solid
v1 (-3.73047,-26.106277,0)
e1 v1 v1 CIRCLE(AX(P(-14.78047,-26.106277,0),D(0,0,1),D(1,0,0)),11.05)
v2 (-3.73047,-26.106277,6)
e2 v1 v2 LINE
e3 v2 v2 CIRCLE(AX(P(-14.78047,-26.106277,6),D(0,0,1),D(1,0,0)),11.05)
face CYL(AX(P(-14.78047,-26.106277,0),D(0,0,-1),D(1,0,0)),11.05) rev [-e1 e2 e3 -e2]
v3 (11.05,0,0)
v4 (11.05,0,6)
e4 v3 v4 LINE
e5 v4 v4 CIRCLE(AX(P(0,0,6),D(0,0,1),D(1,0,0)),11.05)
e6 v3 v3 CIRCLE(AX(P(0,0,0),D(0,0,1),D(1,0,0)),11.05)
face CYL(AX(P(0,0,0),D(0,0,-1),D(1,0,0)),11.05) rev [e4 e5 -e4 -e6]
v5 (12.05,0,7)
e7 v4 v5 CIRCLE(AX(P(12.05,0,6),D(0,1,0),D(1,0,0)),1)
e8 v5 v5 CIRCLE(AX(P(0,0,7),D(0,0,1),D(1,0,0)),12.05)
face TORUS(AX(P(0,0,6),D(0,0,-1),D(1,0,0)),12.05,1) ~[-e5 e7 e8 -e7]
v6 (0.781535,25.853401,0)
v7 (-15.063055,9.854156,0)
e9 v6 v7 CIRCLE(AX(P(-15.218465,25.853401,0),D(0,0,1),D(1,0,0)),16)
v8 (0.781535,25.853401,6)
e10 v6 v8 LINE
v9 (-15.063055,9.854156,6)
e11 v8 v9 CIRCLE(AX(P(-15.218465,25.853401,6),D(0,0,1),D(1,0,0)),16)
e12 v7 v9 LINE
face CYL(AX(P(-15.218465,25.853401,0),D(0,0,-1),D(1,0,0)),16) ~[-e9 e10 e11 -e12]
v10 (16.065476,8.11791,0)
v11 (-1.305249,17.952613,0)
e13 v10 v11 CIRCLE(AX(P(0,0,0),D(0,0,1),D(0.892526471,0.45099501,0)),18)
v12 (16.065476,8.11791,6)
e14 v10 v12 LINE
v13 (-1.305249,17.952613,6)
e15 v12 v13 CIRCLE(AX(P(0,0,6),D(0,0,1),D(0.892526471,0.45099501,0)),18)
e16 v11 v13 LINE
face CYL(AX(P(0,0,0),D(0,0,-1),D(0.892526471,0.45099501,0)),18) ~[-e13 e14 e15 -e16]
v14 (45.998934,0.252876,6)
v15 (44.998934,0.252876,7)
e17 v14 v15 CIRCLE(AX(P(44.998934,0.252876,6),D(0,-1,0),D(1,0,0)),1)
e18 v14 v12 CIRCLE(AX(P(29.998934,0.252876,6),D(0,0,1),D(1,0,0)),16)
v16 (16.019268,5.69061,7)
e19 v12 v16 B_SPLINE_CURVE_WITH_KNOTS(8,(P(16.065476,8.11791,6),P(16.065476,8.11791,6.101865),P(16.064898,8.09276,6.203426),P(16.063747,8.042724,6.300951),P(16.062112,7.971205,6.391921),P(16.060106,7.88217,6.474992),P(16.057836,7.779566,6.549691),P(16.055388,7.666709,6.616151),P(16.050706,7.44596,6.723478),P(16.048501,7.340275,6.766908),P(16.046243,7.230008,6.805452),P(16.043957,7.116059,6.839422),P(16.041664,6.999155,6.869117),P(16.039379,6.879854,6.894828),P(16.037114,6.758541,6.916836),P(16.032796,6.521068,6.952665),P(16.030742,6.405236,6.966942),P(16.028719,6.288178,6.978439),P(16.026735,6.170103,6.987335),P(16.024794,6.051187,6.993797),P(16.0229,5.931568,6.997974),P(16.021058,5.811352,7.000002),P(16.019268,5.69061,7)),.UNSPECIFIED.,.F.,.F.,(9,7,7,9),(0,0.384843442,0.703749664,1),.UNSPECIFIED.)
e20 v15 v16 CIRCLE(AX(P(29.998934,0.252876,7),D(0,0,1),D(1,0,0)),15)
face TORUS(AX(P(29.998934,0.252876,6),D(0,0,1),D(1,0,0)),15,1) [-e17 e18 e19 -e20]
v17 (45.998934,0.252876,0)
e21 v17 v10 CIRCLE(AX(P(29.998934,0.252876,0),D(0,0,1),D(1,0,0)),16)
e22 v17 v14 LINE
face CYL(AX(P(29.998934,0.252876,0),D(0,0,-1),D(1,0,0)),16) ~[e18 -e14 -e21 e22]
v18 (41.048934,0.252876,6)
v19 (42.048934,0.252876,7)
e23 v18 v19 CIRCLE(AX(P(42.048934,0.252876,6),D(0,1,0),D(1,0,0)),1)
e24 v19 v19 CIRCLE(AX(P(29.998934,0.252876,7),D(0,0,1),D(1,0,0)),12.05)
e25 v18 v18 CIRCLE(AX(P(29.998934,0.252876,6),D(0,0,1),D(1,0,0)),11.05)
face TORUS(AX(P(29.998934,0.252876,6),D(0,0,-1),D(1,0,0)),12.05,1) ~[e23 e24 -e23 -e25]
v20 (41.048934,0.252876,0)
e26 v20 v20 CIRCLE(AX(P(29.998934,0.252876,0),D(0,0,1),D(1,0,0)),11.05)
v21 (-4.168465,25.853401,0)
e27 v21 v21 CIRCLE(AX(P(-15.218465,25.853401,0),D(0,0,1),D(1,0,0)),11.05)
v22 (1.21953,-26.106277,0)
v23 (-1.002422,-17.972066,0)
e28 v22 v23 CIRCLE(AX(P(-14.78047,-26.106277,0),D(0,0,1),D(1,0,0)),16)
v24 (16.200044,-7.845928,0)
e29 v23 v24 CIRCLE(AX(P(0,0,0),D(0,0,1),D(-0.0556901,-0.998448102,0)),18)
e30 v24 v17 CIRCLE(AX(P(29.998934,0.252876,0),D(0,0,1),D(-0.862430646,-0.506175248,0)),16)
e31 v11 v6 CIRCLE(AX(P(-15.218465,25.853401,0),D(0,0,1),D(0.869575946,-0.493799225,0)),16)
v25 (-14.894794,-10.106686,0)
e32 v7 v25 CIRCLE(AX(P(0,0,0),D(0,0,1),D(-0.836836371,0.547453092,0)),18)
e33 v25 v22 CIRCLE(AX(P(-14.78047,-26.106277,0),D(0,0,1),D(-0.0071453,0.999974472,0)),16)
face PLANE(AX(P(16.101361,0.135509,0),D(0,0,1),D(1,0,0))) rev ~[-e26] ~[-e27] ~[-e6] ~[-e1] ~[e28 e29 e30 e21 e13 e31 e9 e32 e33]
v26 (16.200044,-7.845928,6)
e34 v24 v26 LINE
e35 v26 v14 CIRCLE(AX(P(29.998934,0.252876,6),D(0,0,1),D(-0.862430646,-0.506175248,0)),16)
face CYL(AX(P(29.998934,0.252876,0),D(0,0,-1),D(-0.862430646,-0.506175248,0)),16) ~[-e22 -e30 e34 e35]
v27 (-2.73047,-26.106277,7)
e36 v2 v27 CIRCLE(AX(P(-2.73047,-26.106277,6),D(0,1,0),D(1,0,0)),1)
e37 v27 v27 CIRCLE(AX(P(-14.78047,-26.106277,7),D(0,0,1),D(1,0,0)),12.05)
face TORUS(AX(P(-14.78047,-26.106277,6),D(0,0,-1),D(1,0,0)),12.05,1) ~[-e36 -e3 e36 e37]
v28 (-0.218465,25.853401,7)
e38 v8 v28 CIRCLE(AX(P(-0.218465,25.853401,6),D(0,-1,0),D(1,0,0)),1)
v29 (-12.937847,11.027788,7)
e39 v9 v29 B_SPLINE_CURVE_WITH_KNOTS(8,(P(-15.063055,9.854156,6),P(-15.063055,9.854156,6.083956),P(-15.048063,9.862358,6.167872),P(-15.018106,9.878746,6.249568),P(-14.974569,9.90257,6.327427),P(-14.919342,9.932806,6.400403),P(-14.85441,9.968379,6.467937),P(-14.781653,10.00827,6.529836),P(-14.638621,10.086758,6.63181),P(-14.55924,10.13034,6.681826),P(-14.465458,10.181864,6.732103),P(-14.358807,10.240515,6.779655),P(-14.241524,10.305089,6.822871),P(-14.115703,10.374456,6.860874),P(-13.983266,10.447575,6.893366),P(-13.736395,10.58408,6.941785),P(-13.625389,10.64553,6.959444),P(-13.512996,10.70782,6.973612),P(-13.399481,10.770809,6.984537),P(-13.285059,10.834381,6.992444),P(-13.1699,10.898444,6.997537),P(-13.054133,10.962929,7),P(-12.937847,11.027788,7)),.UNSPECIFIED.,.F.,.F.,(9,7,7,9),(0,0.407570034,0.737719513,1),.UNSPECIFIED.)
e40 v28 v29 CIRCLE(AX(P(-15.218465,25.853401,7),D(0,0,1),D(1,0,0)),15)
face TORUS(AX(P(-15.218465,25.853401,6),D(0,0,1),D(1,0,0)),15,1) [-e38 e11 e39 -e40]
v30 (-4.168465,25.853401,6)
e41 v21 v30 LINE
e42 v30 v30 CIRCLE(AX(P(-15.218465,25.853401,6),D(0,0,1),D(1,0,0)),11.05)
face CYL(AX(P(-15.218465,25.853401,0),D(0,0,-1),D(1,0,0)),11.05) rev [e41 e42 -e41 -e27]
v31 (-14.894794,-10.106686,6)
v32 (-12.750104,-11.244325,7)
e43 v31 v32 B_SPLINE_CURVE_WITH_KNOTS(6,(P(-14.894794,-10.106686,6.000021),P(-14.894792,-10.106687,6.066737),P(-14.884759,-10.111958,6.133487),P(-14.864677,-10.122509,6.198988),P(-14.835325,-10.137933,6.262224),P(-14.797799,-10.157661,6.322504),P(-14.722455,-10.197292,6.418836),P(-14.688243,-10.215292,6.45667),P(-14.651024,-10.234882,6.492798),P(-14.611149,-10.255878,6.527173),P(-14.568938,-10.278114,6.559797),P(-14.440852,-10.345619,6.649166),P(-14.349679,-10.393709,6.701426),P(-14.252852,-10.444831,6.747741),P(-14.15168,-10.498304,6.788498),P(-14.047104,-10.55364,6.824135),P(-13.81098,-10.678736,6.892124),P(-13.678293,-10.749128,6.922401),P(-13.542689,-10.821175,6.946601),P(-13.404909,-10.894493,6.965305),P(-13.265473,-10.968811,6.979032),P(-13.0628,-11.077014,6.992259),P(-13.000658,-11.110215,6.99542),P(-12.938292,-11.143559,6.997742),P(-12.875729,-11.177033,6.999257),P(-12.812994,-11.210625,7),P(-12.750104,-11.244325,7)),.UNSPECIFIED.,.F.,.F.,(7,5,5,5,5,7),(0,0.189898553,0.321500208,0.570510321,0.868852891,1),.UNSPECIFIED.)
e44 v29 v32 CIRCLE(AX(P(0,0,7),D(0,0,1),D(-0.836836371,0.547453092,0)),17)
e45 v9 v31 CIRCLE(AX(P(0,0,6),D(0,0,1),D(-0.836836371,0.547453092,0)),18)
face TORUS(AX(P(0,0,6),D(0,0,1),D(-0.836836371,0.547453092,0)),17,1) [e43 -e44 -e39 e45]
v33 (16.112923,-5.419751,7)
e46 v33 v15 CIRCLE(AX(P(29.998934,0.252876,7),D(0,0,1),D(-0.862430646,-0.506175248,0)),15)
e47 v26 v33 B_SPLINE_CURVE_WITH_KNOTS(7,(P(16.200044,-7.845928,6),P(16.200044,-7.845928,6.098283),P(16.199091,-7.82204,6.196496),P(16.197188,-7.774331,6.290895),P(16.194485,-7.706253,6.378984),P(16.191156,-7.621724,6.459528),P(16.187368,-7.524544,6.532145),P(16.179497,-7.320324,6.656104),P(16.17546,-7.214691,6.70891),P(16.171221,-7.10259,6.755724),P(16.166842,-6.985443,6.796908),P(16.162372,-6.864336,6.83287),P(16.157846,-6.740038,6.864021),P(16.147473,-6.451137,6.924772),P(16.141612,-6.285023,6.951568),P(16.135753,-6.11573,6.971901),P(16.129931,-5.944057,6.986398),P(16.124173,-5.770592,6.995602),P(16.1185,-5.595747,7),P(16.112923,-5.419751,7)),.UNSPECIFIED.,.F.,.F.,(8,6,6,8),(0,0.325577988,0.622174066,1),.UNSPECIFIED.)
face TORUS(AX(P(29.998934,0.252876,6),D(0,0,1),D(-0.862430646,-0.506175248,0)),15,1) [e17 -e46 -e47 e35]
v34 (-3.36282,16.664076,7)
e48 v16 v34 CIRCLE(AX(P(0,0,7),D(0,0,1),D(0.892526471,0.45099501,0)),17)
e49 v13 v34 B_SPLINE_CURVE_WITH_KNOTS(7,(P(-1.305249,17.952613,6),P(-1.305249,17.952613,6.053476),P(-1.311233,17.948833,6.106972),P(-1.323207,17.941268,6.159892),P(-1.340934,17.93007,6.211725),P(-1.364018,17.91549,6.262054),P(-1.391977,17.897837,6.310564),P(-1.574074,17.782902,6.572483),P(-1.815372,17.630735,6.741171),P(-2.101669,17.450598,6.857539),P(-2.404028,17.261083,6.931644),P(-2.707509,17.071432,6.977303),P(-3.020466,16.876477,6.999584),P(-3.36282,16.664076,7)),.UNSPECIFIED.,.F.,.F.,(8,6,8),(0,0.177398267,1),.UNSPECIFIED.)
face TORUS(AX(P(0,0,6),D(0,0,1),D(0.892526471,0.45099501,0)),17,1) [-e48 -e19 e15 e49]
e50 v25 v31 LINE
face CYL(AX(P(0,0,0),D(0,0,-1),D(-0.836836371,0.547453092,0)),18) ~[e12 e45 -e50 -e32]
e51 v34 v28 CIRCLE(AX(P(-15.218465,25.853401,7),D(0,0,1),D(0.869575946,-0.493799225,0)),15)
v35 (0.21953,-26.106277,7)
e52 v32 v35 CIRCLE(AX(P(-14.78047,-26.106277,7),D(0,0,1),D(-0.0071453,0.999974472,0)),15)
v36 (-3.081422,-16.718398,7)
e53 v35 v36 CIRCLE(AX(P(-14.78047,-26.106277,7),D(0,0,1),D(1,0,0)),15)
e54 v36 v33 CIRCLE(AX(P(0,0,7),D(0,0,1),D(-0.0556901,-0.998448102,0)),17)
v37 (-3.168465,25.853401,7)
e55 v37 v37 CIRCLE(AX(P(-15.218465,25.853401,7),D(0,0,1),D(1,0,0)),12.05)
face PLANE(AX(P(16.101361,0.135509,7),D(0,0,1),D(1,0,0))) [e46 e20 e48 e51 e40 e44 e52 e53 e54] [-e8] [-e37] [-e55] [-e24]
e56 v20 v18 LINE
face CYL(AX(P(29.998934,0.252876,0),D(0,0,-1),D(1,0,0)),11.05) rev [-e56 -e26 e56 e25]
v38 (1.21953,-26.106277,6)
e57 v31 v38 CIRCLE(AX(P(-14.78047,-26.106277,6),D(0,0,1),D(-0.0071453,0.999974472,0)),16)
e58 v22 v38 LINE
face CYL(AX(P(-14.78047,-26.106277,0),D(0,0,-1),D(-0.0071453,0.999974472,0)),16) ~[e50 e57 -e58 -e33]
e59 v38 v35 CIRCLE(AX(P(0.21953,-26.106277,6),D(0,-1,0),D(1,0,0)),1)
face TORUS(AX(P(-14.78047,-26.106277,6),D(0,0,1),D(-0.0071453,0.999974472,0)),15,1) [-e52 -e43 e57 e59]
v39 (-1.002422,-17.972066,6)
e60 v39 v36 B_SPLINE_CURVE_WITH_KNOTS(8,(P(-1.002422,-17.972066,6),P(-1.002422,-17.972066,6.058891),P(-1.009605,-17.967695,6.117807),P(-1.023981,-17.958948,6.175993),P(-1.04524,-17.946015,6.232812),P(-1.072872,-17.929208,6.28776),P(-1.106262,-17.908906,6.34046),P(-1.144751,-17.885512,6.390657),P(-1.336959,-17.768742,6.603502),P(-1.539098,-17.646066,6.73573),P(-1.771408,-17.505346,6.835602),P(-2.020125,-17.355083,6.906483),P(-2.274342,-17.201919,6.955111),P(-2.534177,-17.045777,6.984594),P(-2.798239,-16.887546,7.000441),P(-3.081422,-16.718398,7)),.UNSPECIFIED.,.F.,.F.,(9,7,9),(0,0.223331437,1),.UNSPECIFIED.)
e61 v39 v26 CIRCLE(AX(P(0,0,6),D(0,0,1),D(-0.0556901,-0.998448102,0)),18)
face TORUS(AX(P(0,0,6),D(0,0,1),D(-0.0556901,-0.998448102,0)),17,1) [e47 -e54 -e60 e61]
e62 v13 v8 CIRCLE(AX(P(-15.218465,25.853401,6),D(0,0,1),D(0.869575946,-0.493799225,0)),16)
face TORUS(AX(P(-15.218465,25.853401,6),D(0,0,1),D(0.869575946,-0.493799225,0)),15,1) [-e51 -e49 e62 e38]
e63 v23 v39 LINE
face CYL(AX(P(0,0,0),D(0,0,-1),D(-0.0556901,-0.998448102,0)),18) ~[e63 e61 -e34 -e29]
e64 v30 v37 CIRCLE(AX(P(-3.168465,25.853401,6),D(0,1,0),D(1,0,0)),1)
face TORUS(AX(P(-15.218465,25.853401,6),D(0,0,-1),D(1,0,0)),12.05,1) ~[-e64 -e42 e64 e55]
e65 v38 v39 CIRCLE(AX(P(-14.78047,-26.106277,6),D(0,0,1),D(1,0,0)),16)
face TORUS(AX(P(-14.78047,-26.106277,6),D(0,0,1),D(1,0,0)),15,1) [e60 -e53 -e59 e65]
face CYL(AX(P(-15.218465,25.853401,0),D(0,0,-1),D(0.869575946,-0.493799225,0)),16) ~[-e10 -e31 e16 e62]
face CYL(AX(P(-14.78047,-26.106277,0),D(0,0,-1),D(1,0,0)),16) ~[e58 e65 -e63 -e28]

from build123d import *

# Parameters (mm, degrees)
F0_R     = 11.05
F1_DEPTH = 7
F2_R     = 1


# Not quite as in the source:
# - a feature names something its author has since deleted; it is built from what else it names


with BuildPart() as f1:
    # F0 (on Top) → F1 (new body)
    with BuildSketch(Plane.XY):
        with BuildLine():
            ThreePointArc((16.2000438734, -7.8459275105), (17.5442410739, -4.0248733073), (18, 0))
            ThreePointArc((18, 0), (17.5096912667, 4.1726144976), (16.0654764727, 8.1179101809))
            ThreePointArc((16.0654764727, 8.1179101809), (13.9995026295, 0.1180090099), (16.2000438734, -7.8459275105))
        make_face()
        with BuildLine():
            ThreePointArc((16.0654764727, 8.1179101809), (17.5096912667, 4.1726144976), (18, 0))
            ThreePointArc((18, 0), (17.5442410739, -4.0248733073), (16.2000438734, -7.8459275105))
            ThreePointArc((16.2000438734, -7.8459275105), (34.1952274917, -15.1870433254), (45.9989342061, 0.2528764497))
            ThreePointArc((45.9989342061, 0.2528764497), (34.064932009, 15.7276191574), (16.0654764727, 8.1179101809))
        make_face()
        with Locations((29.9989342061, 0.2528764497)):
            Circle(F0_R, mode=Mode.SUBTRACT)
        with BuildLine():
            ThreePointArc((16.2000438734, -7.8459275105), (13.9995026295, 0.1180090099), (16.0654764727, 8.1179101809))
            ThreePointArc((16.0654764727, 8.1179101809), (8.8682818041, 15.6637664003), (-1.3052493964, 17.952613292))
            ThreePointArc((-1.3052493964, 17.952613292), (-7.1019501152, 12.0649204126), (-15.0630546786, 9.8541556588))
            ThreePointArc((-15.0630546786, 9.8541556588), (-17.9993605237, -0.1517258698), (-14.894794477, -10.1066857815))
            ThreePointArc((-14.894794477, -10.1066857815), (-6.8975525143, -12.1829294224), (-1.0024217941, -17.9720658397))
            ThreePointArc((-1.0024217941, -17.9720658397), (9.1310787195, -15.5120405304), (16.2000438734, -7.8459275105))
        make_face()
        Circle(F0_R, mode=Mode.SUBTRACT)
        with BuildLine():
            ThreePointArc((-15.0630546786, 9.8541556588), (-7.1019501152, 12.0649204126), (-1.3052493964, 17.952613292))
            ThreePointArc((-1.3052493964, 17.952613292), (-9.1310787195, 15.5120405304), (-15.0630546786, 9.8541556588))
        make_face()
        with BuildLine():
            ThreePointArc((-15.0630546786, 9.8541556588), (-9.1310787195, 15.5120405304), (-1.3052493964, 17.952613292))
            ThreePointArc((-1.3052493964, 17.952613292), (0.2510448679, 21.7675375835), (0.7815354675, 25.8534008841))
            ThreePointArc((0.7815354675, 25.8534008841), (-26.5869859329, 37.1120296269), (-15.0630546786, 9.8541556588))
        make_face()
        with Locations((-15.2184645325, 25.8534008841)):
            Circle(F0_R, mode=Mode.SUBTRACT)
        with BuildLine():
            ThreePointArc((1.2195303265, -26.1062773338), (0.6540495297, -21.890163369), (-1.0024217941, -17.9720658397))
            ThreePointArc((-1.0024217941, -17.9720658397), (-8.8682818041, -15.6637664003), (-14.894794477, -10.1066857815))
            ThreePointArc((-14.894794477, -10.1066857815), (-26.0536857884, -37.4603338084), (1.2195303265, -26.1062773338))
        make_face()
        with Locations((-14.7804696735, -26.1062773338)):
            Circle(F0_R, mode=Mode.SUBTRACT)
        with BuildLine():
            ThreePointArc((-14.894794477, -10.1066857815), (-8.8682818041, -15.6637664003), (-1.0024217941, -17.9720658397))
            ThreePointArc((-1.0024217941, -17.9720658397), (-6.8975525143, -12.1829294224), (-14.894794477, -10.1066857815))
        make_face()
    extrude(amount=F1_DEPTH)

    # F2
    f2_edges = [f1.edges().sort_by_distance(p)[0] for p in [
        (45.998366, 0.387744, 7),
        (8.868282, 15.663766, 7),
        (-23.334979, 39.641881, 7),
        (-17.999361, -0.151726, 7),
        (-22.663387, -40.029625, 7),
        (9.131079, -15.512041, 7),
        (18.948934, 0.252876, 7),
        (-11.05, 0, 7),
        (-26.268465, 25.853401, 7),
        (-25.83047, -26.106277, 7),
    ]]
    fillet(f2_edges, radius=F2_R)


solid = f1.part
